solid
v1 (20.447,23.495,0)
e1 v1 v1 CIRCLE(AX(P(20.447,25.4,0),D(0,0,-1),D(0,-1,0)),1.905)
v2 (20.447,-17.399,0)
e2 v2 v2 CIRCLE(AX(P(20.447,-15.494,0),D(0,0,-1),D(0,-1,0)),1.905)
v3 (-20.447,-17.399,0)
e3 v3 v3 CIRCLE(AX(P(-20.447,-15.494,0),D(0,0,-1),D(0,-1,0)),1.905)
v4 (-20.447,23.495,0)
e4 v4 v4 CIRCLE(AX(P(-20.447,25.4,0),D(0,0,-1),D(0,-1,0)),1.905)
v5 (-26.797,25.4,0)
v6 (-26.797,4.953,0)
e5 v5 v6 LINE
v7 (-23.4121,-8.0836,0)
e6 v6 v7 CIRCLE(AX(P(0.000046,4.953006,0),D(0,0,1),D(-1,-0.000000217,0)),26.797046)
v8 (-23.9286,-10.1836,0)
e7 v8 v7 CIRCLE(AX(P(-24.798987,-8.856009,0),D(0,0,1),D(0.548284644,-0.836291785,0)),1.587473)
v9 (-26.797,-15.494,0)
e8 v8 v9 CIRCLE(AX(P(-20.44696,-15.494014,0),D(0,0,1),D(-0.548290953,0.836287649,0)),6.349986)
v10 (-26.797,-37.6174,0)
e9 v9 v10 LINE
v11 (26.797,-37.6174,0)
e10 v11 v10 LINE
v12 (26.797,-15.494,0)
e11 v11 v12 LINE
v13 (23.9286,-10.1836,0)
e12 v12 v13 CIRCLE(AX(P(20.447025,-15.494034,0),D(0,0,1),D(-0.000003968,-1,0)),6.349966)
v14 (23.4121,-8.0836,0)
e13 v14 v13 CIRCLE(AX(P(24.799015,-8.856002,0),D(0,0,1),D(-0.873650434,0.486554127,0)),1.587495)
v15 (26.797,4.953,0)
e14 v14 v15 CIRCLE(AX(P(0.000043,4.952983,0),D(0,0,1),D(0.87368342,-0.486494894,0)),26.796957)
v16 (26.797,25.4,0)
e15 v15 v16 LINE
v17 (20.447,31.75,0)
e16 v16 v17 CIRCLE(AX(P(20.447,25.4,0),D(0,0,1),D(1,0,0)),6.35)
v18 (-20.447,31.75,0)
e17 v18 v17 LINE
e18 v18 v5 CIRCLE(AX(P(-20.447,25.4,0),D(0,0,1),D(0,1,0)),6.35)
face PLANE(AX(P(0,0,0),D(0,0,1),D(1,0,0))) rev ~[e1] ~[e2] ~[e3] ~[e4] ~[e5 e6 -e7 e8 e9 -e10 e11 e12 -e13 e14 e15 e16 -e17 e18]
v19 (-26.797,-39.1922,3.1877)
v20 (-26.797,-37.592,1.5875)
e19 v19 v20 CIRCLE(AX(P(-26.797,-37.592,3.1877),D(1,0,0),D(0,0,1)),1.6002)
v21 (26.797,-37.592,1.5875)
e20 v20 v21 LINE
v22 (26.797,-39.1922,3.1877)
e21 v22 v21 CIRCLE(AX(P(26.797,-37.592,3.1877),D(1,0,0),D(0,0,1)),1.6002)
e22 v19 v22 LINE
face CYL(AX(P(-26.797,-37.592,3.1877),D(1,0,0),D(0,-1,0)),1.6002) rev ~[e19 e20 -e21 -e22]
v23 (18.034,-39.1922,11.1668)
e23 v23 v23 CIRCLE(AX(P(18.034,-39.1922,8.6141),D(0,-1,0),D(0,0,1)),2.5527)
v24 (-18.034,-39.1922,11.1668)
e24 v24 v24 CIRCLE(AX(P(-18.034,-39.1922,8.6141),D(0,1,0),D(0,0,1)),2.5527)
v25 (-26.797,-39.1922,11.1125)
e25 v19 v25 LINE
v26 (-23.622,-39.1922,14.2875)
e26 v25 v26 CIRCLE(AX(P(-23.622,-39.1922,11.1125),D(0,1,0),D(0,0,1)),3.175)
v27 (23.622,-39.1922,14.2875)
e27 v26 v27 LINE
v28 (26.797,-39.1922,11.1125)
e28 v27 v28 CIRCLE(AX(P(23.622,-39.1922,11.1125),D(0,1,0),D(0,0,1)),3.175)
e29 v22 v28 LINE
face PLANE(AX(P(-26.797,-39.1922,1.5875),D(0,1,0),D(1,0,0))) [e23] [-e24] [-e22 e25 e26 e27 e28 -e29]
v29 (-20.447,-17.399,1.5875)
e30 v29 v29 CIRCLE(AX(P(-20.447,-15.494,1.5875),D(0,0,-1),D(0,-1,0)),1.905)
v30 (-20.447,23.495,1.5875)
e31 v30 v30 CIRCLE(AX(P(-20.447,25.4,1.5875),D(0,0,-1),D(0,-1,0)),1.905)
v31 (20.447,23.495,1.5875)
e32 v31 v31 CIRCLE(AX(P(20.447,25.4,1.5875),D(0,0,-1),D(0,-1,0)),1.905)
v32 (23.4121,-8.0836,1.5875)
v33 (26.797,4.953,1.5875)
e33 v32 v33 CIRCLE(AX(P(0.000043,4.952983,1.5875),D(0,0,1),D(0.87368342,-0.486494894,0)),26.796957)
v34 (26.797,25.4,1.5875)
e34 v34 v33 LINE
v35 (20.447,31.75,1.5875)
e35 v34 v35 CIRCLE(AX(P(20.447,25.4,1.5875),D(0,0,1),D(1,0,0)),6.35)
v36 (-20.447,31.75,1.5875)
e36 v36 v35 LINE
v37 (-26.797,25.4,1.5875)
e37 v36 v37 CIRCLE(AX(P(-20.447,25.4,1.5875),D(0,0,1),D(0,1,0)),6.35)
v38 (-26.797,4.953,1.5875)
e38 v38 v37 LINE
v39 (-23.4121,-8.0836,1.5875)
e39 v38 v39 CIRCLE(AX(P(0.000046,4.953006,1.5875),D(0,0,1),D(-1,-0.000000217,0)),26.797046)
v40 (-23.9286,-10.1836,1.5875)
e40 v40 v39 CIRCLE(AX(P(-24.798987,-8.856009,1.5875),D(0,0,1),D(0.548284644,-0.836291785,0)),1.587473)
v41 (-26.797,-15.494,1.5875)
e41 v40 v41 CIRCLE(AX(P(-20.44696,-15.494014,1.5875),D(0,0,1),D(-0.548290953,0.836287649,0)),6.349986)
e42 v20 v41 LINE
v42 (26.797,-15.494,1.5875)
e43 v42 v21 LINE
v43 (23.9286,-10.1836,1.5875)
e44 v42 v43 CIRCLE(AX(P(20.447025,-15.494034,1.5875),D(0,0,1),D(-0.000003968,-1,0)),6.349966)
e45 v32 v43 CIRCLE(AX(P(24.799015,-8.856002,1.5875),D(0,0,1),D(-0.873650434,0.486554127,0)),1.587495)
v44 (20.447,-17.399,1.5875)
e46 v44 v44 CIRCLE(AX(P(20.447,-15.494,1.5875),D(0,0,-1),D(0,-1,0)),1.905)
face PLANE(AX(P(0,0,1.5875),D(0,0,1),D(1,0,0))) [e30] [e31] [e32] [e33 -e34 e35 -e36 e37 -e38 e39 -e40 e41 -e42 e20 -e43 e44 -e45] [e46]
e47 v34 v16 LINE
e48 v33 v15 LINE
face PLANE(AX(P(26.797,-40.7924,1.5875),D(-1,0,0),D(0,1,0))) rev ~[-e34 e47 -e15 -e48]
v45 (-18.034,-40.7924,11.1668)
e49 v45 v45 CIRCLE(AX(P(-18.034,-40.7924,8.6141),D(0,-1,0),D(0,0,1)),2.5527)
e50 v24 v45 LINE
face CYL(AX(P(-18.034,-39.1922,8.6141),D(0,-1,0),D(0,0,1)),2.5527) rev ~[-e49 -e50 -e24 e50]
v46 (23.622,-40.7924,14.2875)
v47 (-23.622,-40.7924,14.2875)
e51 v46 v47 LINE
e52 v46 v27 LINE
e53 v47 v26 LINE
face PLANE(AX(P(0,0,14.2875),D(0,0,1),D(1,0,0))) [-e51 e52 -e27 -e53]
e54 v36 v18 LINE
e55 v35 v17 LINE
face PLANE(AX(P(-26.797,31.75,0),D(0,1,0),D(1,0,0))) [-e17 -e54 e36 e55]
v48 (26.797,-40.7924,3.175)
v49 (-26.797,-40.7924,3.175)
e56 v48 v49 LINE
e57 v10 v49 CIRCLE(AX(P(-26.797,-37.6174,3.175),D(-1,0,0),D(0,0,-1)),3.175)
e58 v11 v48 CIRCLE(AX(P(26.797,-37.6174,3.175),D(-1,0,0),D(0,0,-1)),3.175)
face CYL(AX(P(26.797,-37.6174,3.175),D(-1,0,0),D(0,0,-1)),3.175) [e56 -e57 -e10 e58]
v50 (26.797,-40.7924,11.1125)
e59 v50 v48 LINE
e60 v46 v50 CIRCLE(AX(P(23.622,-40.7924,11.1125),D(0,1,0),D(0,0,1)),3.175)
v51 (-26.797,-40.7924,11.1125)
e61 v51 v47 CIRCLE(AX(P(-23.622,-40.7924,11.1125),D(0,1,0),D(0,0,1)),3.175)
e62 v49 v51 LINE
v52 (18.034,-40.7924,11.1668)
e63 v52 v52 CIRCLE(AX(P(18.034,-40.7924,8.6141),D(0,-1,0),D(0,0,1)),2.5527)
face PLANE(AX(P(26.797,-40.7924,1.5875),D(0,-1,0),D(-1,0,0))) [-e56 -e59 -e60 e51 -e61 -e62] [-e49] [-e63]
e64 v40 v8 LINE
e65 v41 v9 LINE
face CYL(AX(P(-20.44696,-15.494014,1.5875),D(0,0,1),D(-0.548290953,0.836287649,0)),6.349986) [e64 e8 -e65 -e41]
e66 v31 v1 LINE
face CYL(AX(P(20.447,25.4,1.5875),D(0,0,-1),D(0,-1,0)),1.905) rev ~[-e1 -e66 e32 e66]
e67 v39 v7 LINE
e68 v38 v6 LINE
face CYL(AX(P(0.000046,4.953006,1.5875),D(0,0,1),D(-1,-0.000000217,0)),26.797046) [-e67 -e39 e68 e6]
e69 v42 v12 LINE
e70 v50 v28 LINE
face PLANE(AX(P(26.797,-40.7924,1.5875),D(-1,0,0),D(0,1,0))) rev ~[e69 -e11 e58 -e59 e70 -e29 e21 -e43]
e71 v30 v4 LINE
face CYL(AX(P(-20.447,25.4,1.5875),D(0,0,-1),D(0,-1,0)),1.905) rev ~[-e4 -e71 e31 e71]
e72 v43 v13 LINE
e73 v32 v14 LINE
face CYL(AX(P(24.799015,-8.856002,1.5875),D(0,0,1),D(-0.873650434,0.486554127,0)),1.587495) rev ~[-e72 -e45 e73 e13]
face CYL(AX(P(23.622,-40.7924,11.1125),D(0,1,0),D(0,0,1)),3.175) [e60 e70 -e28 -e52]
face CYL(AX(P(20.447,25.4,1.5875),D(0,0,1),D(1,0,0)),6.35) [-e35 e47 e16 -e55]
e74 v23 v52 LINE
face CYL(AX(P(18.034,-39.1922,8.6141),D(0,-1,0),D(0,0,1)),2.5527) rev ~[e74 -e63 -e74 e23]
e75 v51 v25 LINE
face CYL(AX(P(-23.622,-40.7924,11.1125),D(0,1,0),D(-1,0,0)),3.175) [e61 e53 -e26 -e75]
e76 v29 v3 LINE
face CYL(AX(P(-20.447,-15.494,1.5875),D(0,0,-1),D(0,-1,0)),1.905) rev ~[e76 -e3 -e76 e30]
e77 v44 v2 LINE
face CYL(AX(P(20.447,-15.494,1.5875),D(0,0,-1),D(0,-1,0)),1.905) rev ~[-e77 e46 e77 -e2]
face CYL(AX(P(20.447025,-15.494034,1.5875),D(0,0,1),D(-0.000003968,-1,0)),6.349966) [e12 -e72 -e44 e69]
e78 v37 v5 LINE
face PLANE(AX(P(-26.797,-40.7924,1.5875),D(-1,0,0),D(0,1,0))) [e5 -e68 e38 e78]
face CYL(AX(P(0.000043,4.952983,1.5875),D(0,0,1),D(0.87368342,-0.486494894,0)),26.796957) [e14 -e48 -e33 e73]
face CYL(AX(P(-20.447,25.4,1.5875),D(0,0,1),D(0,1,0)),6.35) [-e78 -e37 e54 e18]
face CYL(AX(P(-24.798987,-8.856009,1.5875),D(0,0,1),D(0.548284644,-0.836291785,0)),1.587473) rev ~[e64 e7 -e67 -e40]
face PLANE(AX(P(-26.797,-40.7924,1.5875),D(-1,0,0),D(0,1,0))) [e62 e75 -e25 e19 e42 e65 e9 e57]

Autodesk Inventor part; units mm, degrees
ref_plane "YZ Plane" through (0, 0, 0) normal (1, 0, 0) x (0, 1, 0)
ref_plane "XZ Plane" through (0, 0, 0) normal (0, 1, 0) x (-1, 0, 0)
sketch "Sketch1" plane through (0, 0, 0) normal (0, 0, 1) x (1, 0, 0)
  line L0 (-26.797, 31.75) -> (26.797, 31.75)
  line L1 (26.797, 31.75) -> (26.797, -31.75)
  line L2 (26.797, -31.75) -> (-26.797, -31.75)
  line L3 (-26.797, -31.75) -> (-26.797, 31.75)
  point P0 (0, 0)
  point P1 (-26.797, 0)
  point P2 (0, 31.75)
  dimension "d0" = 53.594
  dimension "d1" = 63.5
extrude "Extrusion1" add sketch "Sketch1" along normal blind 1.5875
sketch "Sketch9" plane through (0, 0, 1.5875) normal (0, 0, 1) x (1, 0, 0)
  line L0 (26.797, 31.75) -> (26.797, -31.75) projected
  line L1 (-26.797, -31.75) -> (-26.797, 31.75) projected
  line L2 (26.797, -31.75) -> (-26.797, -31.75) projected
  line L3 (-26.797, -31.75) -> (26.797, -31.75)
  line L4 (26.797, -31.75) -> (26.797, -40.7924)
  line L5 (26.797, -40.7924) -> (-26.797, -40.7924)
  line L6 (-26.797, -40.7924) -> (-26.797, -31.75)
  line L7 (-26.797, 31.75) -> (26.797, 31.75) projected
  point P0 (0, 0)
  dimension "d60" = 72.5424
extrude "Extrusion5" add sketch "Sketch9" against normal up to surface (1.5875 mm away) contours L4 L5 L6 L2
sketch "Sketch2" plane through (0, 0, 1.5875) normal (0, 0, 1) x (1, 0, 0)
  line L0 (-26.797, -39.1922) -> (26.797, -39.1922)
  line L1 (26.797, -40.7924) -> (-26.797, -40.7924)
  line L2 (26.797, -40.7924) -> (26.797, 31.75) projected
  line L3 (-26.797, -40.7924) -> (26.797, -40.7924) projected
  line L4 (-26.797, -40.7924) -> (-26.797, -39.1922)
  line L5 (26.797, -40.7924) -> (26.797, -39.1922)
  point P0 (-26.797, -31.75)
  point P1 (0, 0)
  dimension "d4" = 53.594
  dimension "d59" = 1.6002
extrude "Extrusion2" add sketch "Sketch2" along normal blind 12.7
sketch "Sketch6" plane through (0, 0, 1.5875) normal (0, 0, 1) x (1, 0, 0)
  line L0 (26.797, 31.75) -> (26.797, -29.3687) projected
  line L1 (-26.797, 31.75) -> (26.797, 31.75) projected
  line L2 (-26.797, -29.3687) -> (-26.797, 31.75) projected
  arc A0 (20.447, -21.844) -> (23.9286, -10.1836) centre (20.447, -15.494) ccw projected
  arc A1 (23.4121, -8.0836) -> (23.9286, -10.1836) centre (24.799, -8.856) ccw projected
  arc A2 (23.4121, -8.0836) -> (26.797, 4.953) centre (0, 4.953) ccw projected
  line L3 (26.797, 25.4) -> (26.797, 4.953) projected
  arc A3 (26.797, 25.4) -> (20.447, 31.75) centre (20.447, 25.4) ccw projected
  line L4 (14.199, 31.75) -> (20.447, 31.75) projected
  line L5 (-14.199, 31.75) -> (14.199, 31.75) projected
  line L6 (-20.447, 31.75) -> (-14.199, 31.75) projected
  arc A4 (-20.447, 31.75) -> (-26.797, 25.4) centre (-20.447, 25.4) ccw projected
  line L7 (-26.797, 4.953) -> (-26.797, 25.4) projected
  arc A5 (-26.797, 4.953) -> (-23.4121, -8.0836) centre (0, 4.953) ccw projected
  arc A6 (-23.9286, -10.1836) -> (-23.4121, -8.0836) centre (-24.799, -8.856) ccw projected
  arc A7 (-23.9286, -10.1836) -> (-20.447, -21.844) centre (-20.447, -15.494) ccw projected
  line L8 (20.447, -21.844) -> (-20.447, -21.844) projected
  arc A8 (-23.9286, -10.1836) -> (-26.797, -15.494) centre (-20.447, -15.494) ccw
  arc A9 (26.797, -15.494) -> (23.9286, -10.1836) centre (20.447, -15.494) ccw
  arc A10 (23.4121, -8.0836) -> (23.9286, -10.1836) centre (24.799, -8.856) ccw
  arc A11 (-23.9286, -10.1836) -> (-23.4121, -8.0836) centre (-24.799, -8.856) ccw
  point P0 (0, 0)
extrude "Extrusion4" cut sketch "Sketch6" against normal up to next contours L0 A3 L1 | L0 A0 A1 A2 | A4 L2 L1 | L2 A5 A6 A7
sketch "Sketch7" plane through (0, 0, 1.5875) normal (0, 0, 1) x (1, 0, 0)
  arc A0 (26.797, 25.4) -> (20.447, 31.75) centre (20.447, 25.4) ccw projected
  arc A1 (-20.447, 31.75) -> (-26.797, 25.4) centre (-20.447, 25.4) ccw projected
  arc A2 (-23.9286, -10.1836) -> (-26.797, -15.494) centre (-20.447, -15.494) ccw projected
  arc A3 (26.797, -15.494) -> (23.9286, -10.1836) centre (20.447, -15.494) ccw projected
  point P0 (0, 0)
hole "Hole3" at (-20.447, 25.4, 1.5875) at (20.447, 25.4, 1.5875) at (20.447, -15.494, 1.5875) at (-20.447, -15.494, 1.5875) direction (0, 0, -1) diameter 3.81 end through all clearance for "Oval Head Machine Screw" size "#6" standard "Ansi Unified Screw Threads"
ref_plane "Work Plane1" through (-26.797, -30.1625, 2.3812) normal (0, 1, 0) x (1, 0, 0)
fillet "Fillet3" radius 1.6002 1 edges at (0, -39.1922, 1.5875)
fillet "Fillet4" radius 3.175 1 edges at (0, -40.7924, 0)
fillet "Fillet5" radius 3.175 2 edges at (-26.797, -39.9923, 14.2875) (26.797, -39.9923, 14.2875)
sketch "Sketch10" plane through (-26.797, -39.1922, 3.1877) normal (0, 1, 0) x (1, 0, 0)
  circle A0 centre (44.831, -5.4264) radius 2.4116 projected
  point P0 (26.797, 3.1877)
hole "Hole6" at (18.034, -39.1922, 8.6141) direction (0, -1, 0) diameter 5.1054 end through all clearance for "Flat Head Machine Screw (82)" size "#10" standard "Ansi Unified Screw Threads"
mirror "Mirror1" about plane through (0, 0, 0) normal (1, 0, 0) of "Hole6"
properties part number "Pneumatics_VIAIR_0090_01" material "Aluminum-6061"
